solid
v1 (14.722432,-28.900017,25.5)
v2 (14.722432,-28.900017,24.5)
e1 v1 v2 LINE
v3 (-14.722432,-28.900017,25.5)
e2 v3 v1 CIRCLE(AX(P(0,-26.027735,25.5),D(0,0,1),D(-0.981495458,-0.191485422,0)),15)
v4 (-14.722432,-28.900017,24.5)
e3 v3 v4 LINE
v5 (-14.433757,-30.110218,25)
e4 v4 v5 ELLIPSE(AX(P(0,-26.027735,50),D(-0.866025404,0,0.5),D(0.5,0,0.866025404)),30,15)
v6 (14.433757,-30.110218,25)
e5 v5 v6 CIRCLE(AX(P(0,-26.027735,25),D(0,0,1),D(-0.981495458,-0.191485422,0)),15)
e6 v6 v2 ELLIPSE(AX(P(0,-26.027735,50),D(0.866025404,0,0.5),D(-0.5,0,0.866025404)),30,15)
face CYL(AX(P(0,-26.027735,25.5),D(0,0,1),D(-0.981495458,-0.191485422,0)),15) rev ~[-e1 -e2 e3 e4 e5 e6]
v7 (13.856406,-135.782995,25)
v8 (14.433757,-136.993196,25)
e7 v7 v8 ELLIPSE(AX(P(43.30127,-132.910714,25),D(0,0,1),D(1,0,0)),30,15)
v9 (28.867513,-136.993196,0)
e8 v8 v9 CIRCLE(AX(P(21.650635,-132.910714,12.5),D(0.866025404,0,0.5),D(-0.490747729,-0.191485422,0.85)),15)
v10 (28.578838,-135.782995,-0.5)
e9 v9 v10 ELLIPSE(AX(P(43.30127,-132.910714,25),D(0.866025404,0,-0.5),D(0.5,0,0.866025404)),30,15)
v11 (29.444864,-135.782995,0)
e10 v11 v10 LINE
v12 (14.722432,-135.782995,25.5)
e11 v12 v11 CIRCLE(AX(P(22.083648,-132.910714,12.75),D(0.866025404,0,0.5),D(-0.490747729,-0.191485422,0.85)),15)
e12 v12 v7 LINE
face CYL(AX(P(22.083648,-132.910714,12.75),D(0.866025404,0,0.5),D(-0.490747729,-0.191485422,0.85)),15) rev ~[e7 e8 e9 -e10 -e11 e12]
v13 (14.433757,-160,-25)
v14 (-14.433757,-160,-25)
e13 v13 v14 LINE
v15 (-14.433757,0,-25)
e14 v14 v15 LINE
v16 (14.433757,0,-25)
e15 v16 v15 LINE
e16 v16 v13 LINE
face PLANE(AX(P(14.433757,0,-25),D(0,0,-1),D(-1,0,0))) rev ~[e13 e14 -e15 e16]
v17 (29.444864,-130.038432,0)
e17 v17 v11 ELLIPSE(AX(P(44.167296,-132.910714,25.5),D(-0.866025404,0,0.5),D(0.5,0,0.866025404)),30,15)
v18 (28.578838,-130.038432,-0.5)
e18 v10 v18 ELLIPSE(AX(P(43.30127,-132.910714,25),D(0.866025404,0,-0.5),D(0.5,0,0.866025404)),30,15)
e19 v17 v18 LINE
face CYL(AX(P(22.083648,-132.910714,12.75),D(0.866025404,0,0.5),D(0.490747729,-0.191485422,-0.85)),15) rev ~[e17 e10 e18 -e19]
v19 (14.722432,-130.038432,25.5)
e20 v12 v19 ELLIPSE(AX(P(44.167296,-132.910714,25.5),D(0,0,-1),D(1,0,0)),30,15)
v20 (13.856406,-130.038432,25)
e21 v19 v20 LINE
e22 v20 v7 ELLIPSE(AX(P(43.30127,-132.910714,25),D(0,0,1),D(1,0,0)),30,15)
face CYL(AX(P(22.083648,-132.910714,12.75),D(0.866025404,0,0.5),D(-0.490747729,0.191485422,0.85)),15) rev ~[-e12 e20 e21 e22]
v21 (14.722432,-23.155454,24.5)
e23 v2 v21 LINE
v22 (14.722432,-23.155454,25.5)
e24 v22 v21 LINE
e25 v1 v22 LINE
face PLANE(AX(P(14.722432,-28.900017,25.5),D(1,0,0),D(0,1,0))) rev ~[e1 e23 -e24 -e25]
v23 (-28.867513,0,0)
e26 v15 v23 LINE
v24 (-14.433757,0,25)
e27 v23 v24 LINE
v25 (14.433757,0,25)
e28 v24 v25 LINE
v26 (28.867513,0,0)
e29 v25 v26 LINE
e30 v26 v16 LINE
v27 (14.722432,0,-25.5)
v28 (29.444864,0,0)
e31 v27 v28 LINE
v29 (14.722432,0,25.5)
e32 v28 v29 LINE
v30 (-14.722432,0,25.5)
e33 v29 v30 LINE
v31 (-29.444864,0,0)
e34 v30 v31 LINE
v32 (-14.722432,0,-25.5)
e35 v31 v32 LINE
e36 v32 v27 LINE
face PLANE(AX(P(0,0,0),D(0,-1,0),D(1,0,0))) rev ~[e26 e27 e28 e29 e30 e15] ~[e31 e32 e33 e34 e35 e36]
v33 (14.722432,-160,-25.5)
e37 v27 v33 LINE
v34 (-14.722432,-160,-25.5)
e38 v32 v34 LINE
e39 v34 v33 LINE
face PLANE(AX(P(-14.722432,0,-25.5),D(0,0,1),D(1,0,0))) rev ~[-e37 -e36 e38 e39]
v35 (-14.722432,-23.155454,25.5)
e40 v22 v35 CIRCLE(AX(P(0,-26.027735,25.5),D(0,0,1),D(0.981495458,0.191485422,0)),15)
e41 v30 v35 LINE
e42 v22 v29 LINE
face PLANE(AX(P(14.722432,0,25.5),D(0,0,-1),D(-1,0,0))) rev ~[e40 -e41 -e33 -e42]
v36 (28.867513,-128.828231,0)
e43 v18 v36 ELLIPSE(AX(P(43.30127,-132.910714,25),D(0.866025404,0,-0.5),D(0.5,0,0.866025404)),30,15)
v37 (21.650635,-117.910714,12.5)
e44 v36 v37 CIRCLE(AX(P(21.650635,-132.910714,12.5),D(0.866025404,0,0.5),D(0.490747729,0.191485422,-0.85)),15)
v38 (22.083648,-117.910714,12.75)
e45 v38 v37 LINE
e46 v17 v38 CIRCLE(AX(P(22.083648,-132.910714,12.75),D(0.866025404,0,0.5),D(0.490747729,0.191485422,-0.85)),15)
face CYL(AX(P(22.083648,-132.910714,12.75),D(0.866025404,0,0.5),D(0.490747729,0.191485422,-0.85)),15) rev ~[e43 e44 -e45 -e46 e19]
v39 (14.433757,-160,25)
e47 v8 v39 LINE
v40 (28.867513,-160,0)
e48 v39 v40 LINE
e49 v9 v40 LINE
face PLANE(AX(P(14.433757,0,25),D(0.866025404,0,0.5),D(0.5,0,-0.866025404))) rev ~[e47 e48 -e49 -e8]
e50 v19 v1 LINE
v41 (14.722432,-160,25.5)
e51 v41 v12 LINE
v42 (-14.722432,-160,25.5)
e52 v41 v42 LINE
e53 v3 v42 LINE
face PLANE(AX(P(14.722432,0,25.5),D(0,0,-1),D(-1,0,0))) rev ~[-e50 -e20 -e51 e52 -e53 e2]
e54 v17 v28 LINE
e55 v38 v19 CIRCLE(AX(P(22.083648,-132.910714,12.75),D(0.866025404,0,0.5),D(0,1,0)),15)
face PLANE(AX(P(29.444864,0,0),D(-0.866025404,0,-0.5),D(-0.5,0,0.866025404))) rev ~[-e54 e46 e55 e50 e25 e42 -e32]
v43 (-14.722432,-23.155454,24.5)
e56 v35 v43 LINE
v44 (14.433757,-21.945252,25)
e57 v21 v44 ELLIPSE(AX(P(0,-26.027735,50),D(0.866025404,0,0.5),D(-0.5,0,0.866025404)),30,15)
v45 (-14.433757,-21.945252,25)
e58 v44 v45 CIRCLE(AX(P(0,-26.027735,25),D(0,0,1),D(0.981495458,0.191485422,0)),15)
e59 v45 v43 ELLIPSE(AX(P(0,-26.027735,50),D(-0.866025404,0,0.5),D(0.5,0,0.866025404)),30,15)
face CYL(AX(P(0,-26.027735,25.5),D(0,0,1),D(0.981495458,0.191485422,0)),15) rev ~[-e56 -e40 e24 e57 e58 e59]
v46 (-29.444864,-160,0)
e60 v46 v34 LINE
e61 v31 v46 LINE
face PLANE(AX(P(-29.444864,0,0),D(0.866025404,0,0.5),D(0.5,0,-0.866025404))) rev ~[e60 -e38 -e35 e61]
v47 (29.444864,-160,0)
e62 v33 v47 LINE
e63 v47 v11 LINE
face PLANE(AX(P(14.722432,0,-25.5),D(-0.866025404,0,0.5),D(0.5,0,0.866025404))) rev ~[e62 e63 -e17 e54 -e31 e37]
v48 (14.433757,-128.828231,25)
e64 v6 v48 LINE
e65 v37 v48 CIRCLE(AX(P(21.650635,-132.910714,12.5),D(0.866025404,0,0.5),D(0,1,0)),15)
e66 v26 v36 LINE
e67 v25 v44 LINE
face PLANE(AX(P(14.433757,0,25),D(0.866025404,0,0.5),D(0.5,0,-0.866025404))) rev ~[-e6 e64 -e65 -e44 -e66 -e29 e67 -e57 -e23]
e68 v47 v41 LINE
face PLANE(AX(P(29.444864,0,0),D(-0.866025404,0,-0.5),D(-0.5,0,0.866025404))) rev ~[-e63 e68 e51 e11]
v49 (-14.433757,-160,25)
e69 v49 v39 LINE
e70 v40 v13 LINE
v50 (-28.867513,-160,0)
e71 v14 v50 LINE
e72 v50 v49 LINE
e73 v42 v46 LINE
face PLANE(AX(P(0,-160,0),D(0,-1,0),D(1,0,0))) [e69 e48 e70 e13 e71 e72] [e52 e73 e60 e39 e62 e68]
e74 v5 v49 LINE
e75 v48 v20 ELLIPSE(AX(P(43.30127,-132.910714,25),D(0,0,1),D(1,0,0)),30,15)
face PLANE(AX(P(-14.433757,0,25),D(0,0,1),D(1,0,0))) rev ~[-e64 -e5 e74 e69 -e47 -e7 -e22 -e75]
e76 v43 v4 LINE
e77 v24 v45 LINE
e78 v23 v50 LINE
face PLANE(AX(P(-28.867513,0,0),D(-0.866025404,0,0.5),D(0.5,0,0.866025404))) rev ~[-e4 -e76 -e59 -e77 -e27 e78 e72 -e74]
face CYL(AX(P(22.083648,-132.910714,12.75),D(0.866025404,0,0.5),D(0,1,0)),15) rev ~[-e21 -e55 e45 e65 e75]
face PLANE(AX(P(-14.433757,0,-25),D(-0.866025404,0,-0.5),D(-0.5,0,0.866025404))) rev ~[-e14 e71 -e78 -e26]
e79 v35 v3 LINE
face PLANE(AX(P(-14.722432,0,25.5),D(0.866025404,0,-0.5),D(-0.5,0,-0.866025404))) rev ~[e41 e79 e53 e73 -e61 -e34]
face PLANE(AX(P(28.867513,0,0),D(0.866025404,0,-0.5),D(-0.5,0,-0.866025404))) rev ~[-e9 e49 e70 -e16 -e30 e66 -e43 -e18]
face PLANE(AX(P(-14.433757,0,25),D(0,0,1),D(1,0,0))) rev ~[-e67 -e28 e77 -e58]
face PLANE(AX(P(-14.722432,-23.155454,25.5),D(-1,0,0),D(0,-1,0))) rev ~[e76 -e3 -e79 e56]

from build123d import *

# Parameters (mm, degrees)
F1_DEPTH = 160
F2_DEPTH = 140
F4_DEPTH = 1.4817621135
F6_DEPTH = 5


# Not quite as in the source:
# - a feature names something its author has since deleted; it is built from what else it names


with BuildPart() as f1:
    # F0 (on Front) → F1 (new body)
    with BuildSketch(Plane.XZ):
        Polygon((14.7224318643, 25.5), (-14.7224318643, 25.5), (-29.4448637287, 0), (-14.7224318643, -25.5), (14.7224318643, -25.5), (29.4448637287, 0), align=None)
        Polygon((-28.8675134595, 0), (-14.4337567297, 25), (14.4337567297, 25), (28.8675134595, 0), (14.4337567297, -25), (12.7224318643, -25), (-12.7224318643, -25), (-14.4337567297, -25), align=None, mode=Mode.SUBTRACT)
    extrude(amount=F1_DEPTH)

    # F0 (on Front) → F2 (join)
    with BuildSketch(Plane.XZ):
        Polygon((14.7224318643, 25.5), (-14.7224318643, 25.5), (-29.4448637287, 0), (-14.7224318643, -25.5), (14.7224318643, -25.5), (29.4448637287, 0), align=None)
        Polygon((-28.8675134595, 0), (-14.4337567297, 25), (14.4337567297, 25), (28.8675134595, 0), (14.4337567297, -25), (12.7224318643, -25), (-12.7224318643, -25), (-14.4337567297, -25), align=None, mode=Mode.SUBTRACT)
    extrude(amount=F2_DEPTH)

    # F3 (on face) → F4 (cut, through all)
    with BuildSketch(Plane(origin=(22.0836477965, 0, 12.75), x_dir=(0, 1, 0), z_dir=(0.8660254038, 0, 0.5))):
        with BuildLine():
            ThreePointArc((-130.0384322302, -14.7224318643), (-121.3330579218, -9.537184599), (-117.9107135534, 0))
            ThreePointArc((-117.9107135534, 0), (-121.3330579218, 9.537184599), (-130.0384322302, 14.7224318643))
            Line((-130.0384322302, 14.7224318643), (-135.7829948767, 14.7224318643))
            ThreePointArc((-135.7829948767, 14.7224318643), (-147.9107135534, 0), (-135.7829948767, -14.7224318643))
            Line((-135.7829948767, -14.7224318643), (-130.0384322302, -14.7224318643))
        make_face()
        with BuildLine():
            ThreePointArc((-135.7829948767, -14.7224318643), (-132.9107135534, -15), (-130.0384322302, -14.7224318643))
            Line((-130.0384322302, -14.7224318643), (-135.7829948767, -14.7224318643))
        make_face()
        with BuildLine():
            Line((-135.7829948767, 14.7224318643), (-130.0384322302, 14.7224318643))
            ThreePointArc((-130.0384322302, 14.7224318643), (-132.9107135534, 15), (-135.7829948767, 14.7224318643))
        make_face()
    extrude(amount=-F4_DEPTH, mode=Mode.SUBTRACT)

    # F5 (on face) → F6 (cut)
    with BuildSketch(Plane.XY.offset(25.5)):
        with BuildLine():
            Line((14.7224318643, -28.900016646), (14.7224318643, -23.1554539994))
            ThreePointArc((14.7224318643, -23.1554539994), (0, -11.0277353227), (-14.7224318643, -23.1554539994))
            Line((-14.7224318643, -23.1554539994), (-14.7224318643, -28.900016646))
            ThreePointArc((-14.7224318643, -28.900016646), (0, -41.0277353227), (14.7224318643, -28.900016646))
        make_face()
    extrude(amount=-F6_DEPTH, mode=Mode.SUBTRACT)


solid = f1.part
